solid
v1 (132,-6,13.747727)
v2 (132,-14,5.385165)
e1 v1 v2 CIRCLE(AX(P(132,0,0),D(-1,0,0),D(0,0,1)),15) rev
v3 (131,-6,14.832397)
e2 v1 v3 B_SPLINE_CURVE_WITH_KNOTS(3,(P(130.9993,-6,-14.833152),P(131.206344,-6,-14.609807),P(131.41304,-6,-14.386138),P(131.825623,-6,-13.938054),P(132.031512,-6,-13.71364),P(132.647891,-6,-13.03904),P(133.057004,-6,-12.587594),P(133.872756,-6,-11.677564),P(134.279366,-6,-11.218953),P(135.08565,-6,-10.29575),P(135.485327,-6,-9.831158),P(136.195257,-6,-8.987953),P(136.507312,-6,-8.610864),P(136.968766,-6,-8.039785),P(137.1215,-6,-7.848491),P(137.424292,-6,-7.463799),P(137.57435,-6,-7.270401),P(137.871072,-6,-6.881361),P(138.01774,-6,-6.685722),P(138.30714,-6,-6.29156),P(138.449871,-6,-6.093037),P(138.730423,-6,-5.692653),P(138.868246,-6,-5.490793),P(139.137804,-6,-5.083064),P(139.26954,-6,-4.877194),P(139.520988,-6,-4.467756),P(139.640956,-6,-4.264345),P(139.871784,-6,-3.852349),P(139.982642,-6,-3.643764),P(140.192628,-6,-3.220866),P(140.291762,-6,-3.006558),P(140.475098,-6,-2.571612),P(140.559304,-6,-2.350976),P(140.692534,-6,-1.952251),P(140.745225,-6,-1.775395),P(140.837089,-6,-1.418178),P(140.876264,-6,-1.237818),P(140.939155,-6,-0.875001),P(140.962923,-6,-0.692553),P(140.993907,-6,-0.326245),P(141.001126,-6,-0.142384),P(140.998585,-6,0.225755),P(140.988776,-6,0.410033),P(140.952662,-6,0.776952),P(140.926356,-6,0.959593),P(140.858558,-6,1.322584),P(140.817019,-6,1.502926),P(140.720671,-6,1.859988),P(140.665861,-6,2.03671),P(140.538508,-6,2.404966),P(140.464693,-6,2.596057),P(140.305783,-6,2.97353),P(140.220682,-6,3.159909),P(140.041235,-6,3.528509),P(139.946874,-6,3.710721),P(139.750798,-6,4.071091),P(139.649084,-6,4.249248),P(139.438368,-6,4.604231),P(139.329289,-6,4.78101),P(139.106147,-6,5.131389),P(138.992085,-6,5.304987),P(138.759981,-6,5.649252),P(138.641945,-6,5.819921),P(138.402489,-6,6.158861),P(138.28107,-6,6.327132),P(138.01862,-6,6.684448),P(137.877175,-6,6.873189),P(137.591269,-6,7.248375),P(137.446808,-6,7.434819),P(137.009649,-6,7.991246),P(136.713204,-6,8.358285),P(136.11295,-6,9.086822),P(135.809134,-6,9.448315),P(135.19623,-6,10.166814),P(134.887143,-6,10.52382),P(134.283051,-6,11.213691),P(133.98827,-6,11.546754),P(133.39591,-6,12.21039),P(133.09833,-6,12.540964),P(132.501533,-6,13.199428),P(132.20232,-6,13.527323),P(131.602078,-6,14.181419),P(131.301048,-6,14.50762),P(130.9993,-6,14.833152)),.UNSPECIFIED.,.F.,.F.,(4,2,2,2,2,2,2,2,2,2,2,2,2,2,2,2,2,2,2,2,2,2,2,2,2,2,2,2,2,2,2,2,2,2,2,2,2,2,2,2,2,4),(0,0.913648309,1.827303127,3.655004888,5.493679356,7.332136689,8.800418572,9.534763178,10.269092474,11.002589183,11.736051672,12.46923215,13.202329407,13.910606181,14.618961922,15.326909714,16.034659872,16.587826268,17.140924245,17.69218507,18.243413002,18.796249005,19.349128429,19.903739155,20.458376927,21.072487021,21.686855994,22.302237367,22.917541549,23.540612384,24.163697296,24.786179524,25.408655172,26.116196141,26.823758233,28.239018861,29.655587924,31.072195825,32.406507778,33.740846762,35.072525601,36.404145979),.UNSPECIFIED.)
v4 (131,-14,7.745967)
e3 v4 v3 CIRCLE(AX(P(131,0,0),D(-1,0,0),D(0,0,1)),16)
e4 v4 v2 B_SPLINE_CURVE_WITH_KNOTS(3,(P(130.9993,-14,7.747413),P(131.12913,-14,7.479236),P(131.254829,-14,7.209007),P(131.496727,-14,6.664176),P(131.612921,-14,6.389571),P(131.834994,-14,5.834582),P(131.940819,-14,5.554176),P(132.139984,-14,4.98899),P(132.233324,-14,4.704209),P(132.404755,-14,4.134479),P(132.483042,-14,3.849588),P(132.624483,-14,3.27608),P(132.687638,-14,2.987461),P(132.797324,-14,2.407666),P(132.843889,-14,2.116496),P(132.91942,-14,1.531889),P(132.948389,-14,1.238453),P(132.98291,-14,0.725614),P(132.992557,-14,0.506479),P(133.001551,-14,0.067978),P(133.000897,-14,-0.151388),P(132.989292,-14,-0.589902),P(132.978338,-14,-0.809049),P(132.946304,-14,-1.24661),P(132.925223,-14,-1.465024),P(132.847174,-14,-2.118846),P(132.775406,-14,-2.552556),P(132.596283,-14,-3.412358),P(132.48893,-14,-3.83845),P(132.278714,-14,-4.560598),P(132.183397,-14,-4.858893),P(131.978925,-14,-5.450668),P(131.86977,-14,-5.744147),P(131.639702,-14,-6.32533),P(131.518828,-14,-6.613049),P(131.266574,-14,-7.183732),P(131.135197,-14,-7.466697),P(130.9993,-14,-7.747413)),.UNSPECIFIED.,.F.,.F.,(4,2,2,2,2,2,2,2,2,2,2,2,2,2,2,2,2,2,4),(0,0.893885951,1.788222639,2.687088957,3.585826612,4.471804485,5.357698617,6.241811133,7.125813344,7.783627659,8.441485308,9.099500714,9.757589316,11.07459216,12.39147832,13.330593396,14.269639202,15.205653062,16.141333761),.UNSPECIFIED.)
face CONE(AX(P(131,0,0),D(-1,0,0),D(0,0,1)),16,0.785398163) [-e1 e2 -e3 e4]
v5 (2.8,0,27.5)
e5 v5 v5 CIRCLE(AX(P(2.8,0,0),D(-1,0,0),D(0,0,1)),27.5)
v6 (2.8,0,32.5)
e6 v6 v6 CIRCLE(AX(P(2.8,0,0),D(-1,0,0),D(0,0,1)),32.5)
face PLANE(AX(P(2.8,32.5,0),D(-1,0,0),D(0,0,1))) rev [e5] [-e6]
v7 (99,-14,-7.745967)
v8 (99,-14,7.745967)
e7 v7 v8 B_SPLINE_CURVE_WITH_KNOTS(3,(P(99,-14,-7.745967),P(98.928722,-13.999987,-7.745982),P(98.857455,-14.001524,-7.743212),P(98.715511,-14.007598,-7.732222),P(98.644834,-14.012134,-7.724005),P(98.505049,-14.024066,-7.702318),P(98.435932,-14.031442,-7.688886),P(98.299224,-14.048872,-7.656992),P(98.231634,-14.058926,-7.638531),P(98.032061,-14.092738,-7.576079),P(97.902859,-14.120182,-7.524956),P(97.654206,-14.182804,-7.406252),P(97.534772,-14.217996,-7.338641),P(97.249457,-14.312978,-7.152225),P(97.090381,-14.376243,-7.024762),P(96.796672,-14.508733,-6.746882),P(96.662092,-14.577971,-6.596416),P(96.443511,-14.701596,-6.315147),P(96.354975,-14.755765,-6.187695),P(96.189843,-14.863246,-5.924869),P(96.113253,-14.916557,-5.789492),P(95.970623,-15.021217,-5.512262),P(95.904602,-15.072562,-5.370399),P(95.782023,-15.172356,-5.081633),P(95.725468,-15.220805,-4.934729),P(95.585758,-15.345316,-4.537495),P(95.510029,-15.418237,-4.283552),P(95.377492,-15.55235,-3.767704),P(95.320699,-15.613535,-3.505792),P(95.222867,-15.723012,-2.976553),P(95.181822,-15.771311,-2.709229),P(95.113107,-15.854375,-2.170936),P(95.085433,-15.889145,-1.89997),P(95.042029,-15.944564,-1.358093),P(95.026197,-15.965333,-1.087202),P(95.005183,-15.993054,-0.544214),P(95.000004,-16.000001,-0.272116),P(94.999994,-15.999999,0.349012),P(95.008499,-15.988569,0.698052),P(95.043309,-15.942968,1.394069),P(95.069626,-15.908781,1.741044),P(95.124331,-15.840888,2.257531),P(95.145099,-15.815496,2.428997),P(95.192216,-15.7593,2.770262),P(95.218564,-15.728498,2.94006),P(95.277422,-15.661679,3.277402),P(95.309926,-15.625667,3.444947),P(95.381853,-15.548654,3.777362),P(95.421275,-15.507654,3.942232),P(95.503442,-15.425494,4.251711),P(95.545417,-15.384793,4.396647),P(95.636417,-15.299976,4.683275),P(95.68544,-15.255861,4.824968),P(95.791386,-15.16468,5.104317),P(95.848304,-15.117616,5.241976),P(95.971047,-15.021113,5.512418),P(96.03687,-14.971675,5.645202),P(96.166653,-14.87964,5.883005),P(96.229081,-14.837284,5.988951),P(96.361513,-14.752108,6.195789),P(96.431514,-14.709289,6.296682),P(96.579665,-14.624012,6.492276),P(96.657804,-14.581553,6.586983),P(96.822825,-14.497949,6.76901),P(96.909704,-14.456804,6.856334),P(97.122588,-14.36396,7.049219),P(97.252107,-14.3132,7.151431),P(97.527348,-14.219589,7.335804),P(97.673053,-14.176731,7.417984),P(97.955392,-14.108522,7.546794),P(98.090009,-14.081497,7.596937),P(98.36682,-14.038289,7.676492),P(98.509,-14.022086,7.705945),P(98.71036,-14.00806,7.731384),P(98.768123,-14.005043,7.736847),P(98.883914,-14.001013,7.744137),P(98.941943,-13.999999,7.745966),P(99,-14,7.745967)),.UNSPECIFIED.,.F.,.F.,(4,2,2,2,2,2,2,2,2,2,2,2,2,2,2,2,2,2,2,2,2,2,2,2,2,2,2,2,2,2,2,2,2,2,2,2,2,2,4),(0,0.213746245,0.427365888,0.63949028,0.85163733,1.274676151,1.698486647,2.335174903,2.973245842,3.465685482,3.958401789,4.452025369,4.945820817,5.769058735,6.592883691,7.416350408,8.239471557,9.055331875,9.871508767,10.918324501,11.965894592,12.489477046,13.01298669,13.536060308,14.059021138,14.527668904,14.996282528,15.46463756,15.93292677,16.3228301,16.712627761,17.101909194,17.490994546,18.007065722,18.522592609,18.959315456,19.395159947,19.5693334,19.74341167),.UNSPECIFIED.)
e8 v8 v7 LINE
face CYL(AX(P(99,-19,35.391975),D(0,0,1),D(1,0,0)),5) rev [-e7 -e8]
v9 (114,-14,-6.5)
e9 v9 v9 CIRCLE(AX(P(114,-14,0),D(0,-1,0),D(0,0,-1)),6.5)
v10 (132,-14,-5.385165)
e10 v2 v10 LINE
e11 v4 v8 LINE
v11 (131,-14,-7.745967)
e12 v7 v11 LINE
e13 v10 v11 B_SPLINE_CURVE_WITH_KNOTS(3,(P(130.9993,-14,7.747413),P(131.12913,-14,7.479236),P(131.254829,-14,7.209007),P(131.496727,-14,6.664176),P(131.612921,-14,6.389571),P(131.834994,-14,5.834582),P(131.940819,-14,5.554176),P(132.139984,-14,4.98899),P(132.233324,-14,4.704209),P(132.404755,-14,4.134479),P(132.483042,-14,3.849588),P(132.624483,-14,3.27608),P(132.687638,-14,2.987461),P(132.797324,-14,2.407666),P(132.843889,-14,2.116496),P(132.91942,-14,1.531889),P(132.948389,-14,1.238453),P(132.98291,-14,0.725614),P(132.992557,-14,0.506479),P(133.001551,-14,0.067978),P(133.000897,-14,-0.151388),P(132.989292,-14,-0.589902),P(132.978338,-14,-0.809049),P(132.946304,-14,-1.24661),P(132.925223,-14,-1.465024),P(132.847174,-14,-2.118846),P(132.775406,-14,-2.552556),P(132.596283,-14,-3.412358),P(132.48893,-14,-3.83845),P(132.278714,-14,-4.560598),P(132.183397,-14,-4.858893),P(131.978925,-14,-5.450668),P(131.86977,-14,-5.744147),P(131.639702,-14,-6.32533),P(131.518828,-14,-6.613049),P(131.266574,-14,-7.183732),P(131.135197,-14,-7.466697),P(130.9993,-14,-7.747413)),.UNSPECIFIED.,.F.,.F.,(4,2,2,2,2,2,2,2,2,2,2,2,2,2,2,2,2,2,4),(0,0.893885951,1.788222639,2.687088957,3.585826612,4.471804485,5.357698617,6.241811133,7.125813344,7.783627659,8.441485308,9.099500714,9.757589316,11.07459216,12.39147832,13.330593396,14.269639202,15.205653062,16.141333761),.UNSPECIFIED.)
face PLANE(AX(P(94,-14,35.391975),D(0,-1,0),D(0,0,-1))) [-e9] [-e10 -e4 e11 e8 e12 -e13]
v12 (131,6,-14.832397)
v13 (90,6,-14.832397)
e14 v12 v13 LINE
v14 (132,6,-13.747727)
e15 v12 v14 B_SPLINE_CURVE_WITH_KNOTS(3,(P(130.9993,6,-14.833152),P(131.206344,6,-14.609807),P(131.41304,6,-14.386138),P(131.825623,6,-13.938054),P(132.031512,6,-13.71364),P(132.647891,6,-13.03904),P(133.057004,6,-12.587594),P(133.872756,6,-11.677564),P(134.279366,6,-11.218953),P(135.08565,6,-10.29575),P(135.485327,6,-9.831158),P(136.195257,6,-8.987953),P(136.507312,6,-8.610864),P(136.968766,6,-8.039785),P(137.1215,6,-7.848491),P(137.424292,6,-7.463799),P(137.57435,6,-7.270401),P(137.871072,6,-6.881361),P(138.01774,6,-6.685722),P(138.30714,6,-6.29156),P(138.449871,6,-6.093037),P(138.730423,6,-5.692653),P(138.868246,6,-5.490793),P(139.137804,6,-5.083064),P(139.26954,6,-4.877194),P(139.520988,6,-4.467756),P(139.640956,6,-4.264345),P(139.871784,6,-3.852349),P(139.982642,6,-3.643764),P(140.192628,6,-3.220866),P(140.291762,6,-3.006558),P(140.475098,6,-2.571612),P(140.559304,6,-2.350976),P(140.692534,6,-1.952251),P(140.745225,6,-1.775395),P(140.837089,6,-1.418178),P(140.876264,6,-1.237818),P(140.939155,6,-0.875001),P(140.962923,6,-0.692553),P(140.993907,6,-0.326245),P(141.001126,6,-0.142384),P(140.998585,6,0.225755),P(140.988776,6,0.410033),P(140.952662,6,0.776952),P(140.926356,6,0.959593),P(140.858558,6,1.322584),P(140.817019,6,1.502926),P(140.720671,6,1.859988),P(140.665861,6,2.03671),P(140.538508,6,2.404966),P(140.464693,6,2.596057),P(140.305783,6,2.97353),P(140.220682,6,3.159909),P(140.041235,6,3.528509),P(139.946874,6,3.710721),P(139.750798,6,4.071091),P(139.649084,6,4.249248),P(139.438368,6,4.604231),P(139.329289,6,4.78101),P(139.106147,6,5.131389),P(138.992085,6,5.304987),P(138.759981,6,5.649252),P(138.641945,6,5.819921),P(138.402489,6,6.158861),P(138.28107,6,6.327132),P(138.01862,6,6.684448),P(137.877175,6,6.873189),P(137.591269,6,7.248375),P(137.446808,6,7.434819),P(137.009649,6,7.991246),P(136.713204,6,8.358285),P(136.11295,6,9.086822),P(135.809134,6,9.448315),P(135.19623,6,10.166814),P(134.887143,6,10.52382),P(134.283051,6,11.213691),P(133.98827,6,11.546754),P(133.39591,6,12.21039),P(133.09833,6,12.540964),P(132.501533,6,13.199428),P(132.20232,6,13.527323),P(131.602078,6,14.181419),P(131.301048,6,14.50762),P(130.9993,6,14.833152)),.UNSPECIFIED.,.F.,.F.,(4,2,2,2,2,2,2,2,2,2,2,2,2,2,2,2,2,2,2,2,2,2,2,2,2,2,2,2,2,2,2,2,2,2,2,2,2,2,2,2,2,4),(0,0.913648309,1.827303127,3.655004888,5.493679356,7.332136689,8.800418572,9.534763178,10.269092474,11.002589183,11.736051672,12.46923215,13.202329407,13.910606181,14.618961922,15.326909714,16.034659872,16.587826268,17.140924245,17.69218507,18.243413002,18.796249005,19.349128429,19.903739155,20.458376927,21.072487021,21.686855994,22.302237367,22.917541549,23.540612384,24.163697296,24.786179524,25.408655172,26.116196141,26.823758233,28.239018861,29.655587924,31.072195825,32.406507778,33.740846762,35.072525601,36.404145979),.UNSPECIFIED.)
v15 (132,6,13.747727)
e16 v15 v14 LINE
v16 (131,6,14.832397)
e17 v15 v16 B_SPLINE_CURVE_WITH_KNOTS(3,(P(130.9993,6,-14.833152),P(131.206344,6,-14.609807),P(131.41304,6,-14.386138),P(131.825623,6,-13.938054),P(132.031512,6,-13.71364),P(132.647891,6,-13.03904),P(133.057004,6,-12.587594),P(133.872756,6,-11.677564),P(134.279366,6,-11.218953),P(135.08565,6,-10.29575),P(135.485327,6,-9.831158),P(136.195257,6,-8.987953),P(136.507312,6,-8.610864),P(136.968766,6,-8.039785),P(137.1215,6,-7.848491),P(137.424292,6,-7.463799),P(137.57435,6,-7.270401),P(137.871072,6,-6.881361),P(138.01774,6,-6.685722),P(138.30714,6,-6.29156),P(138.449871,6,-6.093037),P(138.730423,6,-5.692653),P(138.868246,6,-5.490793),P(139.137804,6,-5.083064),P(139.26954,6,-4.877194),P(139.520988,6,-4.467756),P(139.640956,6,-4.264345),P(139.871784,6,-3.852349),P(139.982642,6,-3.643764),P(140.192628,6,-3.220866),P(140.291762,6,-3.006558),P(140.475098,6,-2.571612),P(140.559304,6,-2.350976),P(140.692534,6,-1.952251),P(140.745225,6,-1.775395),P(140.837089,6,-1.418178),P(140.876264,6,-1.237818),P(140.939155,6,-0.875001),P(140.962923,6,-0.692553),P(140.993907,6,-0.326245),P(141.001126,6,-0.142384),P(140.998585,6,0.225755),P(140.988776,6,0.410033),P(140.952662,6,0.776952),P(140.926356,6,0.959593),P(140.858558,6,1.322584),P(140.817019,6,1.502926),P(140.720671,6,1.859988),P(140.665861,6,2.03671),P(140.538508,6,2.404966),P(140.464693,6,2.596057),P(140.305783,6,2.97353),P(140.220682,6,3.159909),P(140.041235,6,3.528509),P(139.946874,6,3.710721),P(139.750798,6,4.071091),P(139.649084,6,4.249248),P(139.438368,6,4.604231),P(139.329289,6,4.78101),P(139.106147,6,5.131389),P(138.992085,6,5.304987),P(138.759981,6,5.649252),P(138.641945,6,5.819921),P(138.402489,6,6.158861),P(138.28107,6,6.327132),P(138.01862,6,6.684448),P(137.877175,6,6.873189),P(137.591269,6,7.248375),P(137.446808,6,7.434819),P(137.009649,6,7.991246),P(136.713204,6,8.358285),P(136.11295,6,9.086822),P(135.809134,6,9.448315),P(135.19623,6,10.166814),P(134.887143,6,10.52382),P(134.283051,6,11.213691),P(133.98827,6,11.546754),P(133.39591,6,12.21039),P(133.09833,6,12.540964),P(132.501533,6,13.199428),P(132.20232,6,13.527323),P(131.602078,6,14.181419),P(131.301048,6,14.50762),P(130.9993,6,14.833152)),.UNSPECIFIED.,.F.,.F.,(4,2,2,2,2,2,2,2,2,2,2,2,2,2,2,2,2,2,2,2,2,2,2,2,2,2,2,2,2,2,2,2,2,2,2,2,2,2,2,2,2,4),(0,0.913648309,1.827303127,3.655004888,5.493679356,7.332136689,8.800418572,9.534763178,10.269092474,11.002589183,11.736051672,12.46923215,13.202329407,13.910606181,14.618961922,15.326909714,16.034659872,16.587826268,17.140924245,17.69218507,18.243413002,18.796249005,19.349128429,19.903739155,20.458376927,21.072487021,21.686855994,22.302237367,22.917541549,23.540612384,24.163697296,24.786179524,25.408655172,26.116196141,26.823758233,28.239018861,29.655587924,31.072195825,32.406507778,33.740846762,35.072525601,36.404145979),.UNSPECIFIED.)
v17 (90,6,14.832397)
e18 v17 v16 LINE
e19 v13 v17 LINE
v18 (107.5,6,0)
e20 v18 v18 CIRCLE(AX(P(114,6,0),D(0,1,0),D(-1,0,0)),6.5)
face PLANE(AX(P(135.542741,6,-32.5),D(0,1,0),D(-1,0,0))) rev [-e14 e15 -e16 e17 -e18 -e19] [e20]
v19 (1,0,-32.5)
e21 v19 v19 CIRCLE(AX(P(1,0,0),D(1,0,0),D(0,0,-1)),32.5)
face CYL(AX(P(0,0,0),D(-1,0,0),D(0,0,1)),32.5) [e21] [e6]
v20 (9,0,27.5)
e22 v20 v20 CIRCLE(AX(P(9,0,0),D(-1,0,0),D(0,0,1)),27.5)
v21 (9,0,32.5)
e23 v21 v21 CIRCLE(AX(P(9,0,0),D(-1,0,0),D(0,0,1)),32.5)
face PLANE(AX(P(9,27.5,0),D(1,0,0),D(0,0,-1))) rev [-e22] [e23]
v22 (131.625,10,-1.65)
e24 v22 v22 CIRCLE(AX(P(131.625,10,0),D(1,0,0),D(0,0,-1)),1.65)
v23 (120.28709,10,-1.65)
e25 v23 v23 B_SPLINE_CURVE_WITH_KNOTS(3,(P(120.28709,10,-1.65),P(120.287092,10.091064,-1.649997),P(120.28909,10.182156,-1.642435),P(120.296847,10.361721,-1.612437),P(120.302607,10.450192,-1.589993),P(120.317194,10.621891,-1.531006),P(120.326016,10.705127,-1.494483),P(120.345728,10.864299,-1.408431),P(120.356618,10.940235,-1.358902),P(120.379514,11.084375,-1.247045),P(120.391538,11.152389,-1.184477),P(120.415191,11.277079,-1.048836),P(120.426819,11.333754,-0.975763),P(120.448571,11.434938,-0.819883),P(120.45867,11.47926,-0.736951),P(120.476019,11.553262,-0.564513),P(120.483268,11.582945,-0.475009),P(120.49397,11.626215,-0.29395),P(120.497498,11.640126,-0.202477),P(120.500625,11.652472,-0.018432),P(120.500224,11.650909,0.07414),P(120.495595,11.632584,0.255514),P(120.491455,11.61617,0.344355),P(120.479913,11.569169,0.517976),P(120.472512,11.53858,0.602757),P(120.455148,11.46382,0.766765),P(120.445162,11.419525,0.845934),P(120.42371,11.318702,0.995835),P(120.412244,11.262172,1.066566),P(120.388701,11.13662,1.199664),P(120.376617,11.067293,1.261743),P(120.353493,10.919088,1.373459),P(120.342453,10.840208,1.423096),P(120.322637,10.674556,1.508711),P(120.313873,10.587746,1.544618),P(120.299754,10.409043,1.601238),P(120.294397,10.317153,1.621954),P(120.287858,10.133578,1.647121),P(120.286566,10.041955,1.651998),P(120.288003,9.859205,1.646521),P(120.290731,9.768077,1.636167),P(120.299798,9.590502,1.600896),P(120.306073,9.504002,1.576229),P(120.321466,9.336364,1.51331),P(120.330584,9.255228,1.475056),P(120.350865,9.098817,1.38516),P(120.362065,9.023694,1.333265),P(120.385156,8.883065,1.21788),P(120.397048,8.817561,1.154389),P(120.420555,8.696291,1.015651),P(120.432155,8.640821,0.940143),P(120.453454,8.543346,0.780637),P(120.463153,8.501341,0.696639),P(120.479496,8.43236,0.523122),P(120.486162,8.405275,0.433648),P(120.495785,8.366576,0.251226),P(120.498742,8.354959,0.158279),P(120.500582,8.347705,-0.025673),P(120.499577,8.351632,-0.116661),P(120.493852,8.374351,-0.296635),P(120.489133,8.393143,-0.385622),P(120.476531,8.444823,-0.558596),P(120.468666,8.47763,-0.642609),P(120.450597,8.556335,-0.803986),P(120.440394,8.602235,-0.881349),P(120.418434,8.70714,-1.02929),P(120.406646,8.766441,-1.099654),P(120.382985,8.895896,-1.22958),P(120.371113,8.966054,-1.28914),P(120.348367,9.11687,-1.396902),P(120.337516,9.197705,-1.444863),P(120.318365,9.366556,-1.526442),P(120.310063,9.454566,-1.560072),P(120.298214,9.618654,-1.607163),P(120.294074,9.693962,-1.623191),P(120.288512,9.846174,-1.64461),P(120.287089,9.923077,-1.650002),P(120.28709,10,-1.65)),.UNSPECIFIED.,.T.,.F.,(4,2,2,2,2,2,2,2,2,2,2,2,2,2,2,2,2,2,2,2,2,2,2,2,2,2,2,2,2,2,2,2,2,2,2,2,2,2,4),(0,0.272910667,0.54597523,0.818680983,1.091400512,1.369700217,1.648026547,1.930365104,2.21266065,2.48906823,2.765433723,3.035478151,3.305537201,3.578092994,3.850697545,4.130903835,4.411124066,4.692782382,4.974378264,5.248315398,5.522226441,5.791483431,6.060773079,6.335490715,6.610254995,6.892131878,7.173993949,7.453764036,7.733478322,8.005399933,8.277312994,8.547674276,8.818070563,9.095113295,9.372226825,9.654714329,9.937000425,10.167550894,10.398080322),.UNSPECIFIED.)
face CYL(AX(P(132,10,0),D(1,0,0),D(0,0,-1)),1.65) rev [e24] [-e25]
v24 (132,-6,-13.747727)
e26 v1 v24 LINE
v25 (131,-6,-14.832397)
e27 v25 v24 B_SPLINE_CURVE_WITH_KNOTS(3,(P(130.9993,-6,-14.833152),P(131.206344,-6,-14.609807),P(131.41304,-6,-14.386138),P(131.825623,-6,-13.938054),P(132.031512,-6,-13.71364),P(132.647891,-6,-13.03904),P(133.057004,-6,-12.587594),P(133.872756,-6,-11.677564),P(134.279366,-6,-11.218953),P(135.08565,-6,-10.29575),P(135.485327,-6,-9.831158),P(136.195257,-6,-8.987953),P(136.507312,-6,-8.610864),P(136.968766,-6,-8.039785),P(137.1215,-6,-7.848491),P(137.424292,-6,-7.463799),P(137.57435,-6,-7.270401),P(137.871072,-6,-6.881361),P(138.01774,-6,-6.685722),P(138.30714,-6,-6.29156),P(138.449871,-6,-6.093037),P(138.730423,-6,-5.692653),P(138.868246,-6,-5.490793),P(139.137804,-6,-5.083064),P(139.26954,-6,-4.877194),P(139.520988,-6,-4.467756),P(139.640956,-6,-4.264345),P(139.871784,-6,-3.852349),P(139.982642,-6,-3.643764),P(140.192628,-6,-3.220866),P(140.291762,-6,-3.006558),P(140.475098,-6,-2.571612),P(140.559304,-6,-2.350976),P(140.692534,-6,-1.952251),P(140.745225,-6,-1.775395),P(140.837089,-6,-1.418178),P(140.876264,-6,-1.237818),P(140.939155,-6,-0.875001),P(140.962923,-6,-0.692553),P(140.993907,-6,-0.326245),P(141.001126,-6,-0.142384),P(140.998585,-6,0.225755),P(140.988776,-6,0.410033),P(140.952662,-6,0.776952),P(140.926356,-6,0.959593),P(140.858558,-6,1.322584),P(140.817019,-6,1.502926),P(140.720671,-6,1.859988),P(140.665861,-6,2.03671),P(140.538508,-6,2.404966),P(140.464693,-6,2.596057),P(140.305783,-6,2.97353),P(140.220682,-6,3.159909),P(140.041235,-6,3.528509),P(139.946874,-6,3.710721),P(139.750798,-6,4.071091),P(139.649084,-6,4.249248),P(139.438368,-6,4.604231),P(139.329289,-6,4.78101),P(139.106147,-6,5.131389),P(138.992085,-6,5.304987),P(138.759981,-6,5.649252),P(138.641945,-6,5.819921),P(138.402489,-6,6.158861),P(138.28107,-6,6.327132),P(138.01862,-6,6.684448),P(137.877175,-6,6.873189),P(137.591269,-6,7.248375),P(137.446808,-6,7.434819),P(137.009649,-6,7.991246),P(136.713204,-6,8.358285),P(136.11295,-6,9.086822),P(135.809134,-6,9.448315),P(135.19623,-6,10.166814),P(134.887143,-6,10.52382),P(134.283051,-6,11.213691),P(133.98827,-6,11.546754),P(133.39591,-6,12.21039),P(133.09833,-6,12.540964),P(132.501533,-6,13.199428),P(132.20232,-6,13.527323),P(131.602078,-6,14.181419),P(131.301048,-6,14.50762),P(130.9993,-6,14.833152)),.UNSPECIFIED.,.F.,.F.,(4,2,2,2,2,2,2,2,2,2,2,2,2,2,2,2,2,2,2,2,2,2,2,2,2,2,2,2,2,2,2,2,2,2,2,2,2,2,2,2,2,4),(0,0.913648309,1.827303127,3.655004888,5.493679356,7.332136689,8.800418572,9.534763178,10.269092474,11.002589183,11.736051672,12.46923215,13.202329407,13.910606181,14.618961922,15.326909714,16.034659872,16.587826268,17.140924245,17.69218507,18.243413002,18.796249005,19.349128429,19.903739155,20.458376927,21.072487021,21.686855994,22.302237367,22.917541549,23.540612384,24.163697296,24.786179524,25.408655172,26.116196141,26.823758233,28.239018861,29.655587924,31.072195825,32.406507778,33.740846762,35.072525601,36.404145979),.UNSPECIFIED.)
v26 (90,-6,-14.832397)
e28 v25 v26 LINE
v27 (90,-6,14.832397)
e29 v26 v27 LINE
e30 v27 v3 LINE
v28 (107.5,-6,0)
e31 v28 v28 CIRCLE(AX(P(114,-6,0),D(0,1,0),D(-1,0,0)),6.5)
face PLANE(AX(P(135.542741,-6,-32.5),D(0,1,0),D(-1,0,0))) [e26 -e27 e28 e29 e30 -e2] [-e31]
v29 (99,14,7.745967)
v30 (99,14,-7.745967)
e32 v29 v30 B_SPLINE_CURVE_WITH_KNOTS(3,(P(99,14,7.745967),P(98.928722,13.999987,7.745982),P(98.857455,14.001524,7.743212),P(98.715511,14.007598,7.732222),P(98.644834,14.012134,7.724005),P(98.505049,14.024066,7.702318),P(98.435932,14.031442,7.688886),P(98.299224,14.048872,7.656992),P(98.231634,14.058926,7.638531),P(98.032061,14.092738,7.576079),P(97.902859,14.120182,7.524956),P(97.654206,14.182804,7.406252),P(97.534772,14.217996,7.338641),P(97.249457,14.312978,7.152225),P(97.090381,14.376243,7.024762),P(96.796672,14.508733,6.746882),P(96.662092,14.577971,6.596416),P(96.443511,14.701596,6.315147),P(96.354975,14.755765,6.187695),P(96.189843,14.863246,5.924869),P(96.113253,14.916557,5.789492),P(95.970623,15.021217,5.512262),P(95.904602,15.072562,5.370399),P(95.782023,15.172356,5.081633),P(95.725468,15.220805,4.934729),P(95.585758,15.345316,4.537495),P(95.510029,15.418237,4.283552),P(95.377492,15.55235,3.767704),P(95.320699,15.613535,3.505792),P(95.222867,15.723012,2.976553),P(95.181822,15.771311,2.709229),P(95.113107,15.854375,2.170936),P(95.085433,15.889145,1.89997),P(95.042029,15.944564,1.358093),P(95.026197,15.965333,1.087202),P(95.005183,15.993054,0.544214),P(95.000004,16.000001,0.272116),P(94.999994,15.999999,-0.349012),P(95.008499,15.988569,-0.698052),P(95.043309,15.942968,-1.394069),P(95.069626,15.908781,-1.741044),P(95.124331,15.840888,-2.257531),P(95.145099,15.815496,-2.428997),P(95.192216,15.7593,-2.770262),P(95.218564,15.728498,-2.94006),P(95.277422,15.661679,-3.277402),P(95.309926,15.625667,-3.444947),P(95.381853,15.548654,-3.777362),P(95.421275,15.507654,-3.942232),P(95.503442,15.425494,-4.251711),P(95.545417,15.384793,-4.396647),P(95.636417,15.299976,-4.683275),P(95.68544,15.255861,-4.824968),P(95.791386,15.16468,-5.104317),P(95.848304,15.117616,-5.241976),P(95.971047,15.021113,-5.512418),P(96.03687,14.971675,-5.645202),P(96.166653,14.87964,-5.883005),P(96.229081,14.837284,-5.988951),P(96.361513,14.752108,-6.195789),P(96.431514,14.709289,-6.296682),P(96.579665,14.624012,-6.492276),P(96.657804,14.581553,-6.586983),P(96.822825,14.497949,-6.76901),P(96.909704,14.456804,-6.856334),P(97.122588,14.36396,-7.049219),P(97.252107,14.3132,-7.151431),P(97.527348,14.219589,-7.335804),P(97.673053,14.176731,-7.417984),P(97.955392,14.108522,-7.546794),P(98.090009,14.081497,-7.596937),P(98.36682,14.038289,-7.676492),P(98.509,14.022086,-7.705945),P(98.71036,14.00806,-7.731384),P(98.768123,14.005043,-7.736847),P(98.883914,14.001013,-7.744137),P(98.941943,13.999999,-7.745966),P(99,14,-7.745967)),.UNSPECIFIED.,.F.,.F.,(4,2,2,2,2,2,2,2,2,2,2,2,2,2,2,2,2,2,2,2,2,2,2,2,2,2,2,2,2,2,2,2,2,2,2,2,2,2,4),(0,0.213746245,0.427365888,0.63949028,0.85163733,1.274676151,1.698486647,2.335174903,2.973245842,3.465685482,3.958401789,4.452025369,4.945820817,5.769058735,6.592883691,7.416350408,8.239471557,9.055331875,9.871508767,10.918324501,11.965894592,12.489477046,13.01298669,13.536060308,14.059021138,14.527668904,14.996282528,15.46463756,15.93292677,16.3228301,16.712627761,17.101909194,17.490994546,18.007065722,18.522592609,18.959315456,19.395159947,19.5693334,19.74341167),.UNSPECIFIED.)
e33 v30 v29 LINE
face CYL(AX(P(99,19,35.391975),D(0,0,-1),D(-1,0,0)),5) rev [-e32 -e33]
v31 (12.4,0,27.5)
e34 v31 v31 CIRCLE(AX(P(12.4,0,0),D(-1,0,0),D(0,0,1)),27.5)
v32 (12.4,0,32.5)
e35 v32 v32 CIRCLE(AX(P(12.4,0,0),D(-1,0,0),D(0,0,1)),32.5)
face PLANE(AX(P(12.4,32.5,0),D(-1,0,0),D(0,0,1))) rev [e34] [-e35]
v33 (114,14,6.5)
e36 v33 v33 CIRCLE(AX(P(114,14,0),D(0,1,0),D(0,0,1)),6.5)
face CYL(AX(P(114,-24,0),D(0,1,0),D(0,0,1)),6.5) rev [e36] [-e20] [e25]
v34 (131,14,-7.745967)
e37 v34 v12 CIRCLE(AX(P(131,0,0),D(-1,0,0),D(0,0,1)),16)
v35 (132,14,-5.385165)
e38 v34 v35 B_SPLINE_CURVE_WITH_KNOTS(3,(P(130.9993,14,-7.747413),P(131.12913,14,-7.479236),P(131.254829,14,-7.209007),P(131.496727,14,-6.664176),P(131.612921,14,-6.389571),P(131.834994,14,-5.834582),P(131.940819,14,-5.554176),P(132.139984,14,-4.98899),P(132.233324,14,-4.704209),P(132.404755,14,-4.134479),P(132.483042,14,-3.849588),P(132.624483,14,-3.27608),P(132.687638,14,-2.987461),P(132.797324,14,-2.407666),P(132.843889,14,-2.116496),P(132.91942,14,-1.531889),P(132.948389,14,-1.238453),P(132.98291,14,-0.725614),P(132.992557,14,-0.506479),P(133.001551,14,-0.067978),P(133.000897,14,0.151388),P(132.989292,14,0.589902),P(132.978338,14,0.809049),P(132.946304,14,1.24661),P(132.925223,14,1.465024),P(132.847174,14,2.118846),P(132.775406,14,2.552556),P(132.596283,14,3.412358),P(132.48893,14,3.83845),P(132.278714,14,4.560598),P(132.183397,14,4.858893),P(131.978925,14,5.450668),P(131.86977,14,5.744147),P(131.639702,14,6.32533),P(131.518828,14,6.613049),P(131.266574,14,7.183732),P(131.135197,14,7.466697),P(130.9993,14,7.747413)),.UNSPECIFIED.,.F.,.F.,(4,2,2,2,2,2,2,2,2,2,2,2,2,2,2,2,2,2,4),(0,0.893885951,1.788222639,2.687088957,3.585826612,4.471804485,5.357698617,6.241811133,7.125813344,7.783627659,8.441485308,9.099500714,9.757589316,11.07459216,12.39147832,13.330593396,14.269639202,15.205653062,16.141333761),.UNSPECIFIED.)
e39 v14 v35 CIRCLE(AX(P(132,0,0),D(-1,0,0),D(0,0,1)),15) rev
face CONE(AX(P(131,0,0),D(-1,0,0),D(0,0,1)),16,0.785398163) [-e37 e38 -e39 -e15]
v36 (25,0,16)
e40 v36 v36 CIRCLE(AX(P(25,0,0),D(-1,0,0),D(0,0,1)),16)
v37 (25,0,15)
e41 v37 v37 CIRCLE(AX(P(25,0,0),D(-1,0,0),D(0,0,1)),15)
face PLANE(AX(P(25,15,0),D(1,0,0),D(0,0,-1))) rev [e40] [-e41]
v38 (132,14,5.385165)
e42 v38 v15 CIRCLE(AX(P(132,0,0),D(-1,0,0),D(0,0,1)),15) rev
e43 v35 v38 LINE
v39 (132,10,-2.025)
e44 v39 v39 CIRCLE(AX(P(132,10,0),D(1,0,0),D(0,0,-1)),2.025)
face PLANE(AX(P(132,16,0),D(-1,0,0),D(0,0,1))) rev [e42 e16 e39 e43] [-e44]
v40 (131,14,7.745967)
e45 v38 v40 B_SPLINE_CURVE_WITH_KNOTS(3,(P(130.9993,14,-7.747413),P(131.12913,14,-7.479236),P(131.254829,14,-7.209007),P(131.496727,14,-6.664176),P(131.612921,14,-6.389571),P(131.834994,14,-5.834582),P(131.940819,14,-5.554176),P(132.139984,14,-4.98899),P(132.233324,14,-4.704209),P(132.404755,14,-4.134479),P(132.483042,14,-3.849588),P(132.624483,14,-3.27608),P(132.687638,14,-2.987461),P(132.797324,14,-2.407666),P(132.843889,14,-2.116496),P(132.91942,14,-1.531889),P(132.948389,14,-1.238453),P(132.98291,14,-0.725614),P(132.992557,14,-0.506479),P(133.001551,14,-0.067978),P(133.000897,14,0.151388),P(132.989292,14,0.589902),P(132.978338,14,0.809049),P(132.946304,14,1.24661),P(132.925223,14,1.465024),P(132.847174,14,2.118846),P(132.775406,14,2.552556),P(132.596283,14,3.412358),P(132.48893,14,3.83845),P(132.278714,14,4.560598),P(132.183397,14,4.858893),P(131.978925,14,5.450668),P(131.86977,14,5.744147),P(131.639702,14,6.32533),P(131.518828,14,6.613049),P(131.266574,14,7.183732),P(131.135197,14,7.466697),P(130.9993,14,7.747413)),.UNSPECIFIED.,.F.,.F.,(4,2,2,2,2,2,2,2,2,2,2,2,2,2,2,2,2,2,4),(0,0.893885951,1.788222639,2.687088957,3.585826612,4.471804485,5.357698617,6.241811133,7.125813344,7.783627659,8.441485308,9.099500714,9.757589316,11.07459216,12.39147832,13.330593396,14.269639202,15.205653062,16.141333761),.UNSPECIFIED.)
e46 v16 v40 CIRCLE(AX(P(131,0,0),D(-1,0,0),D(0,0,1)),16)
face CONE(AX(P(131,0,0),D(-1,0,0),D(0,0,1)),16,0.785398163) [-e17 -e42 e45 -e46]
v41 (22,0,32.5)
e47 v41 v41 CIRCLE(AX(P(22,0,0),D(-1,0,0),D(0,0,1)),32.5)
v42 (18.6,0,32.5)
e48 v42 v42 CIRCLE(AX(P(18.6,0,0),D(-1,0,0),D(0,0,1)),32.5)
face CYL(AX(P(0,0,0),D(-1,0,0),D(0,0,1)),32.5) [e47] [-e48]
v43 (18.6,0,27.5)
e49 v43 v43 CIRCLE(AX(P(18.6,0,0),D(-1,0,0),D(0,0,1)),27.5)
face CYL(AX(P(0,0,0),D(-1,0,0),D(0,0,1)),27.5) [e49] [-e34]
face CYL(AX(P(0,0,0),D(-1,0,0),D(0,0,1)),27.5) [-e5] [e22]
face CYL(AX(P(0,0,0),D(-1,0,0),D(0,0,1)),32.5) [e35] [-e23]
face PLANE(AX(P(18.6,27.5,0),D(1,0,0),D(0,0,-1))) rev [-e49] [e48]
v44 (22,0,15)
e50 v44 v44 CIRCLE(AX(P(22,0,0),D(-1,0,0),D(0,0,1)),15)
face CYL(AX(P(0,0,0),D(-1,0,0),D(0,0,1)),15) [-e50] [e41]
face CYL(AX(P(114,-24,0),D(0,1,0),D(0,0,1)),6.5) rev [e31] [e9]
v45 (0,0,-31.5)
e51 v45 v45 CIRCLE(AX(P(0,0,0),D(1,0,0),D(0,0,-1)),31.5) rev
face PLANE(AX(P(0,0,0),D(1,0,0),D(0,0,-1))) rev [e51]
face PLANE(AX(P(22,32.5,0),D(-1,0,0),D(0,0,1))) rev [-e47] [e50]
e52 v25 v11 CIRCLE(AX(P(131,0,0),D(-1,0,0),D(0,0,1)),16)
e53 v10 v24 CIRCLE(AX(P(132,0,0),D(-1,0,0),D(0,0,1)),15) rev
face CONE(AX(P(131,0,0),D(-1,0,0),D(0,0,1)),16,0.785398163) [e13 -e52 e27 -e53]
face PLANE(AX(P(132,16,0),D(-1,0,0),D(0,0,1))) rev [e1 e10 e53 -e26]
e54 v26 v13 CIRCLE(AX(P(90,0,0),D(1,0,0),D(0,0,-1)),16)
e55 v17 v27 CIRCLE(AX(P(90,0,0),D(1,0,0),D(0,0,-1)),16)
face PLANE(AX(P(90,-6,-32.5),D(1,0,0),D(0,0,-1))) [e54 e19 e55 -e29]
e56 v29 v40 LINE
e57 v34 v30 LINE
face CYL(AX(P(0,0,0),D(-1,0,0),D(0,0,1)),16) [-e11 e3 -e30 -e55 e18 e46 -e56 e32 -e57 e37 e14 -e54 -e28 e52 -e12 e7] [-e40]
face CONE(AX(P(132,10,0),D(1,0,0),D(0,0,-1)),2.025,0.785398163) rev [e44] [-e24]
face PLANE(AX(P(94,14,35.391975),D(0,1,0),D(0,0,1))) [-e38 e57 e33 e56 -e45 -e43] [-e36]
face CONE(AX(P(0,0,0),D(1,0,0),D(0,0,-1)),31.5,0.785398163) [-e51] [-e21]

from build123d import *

# Parameters (mm, degrees)
CHAMFER_2_SIZE           = 1
CHAMFER_1_SIZE           = 1
CUT_EXTRUDE_1_DEPTH      = 140.773030303
CUT_EXTRUDE_1_DEPTH_BACK = 140.773030303
SKETCH_2_W               = 45.54274113
SKETCH_2_H               = 12
SKETCH_3_OUTSIDE_W       = 99.17
SKETCH_3_OUTSIDE_H       = 99.17
SKETCH_3_OUTSIDE_W_2     = 70.7839493
SKETCH_3_OUTSIDE_H_2     = 28
CUT_EXTRUDE_1_2_DEPTH    = 38
FILLET_1_R               = 5
SKETCH_4_R               = 6.5
CUT_EXTRUDE_2_DEPTH      = 38


# Read off the part's stored shape, not the designer's step: M4 螺纹孔1
with BuildPart() as part:
    # 草图1 → 旋转1 (revolve)
    with BuildSketch(Plane.XY, mode=Mode.PRIVATE) as revolve_1_sk:
        Polygon((0, 0), (0, 32.5), (2.8, 32.5), (2.8, 27.5), (9, 27.5), (9, 32.5), (12.4, 32.5), (12.4, 27.5), (18.6, 27.5), (18.6, 32.5), (22, 32.5), (22, 15), (25, 15), (25, 16), (132, 16), (132, 0), align=None)
    revolve(revolve_1_sk.sketch.rotate(Axis((0, 0, 0), (1, 0, 0)), 90), axis=Axis((0, 0, 0), (1, 0, 0)))

    # 倒角2
    chamfer_2_edges = [part.edges().sort_by_distance(p)[0] for p in [
        (132, 0, -16),
    ]]
    chamfer(chamfer_2_edges, length=CHAMFER_2_SIZE)

    # 倒角1
    chamfer_1_edges = [part.edges().sort_by_distance(p)[0] for p in [
        (0, 0, -32.5),
    ]]
    chamfer(chamfer_1_edges, length=CHAMFER_1_SIZE)

    # 草图2 → Cut-Extrude 1 (cut, two sides: drawn at the far end of the back side and taken through both)
    with BuildSketch(Plane.XY.offset(-CUT_EXTRUDE_1_DEPTH_BACK)):
        with Locations((112.771370565, 0)):
            Rectangle(SKETCH_2_W, SKETCH_2_H)
    extrude(amount=CUT_EXTRUDE_1_DEPTH + CUT_EXTRUDE_1_DEPTH_BACK, mode=Mode.SUBTRACT)

    # 草图3 outside → Cut-Extrude 1 2 (cut)
    with BuildSketch(Plane(origin=(132, 0, 0), x_dir=(0, 0, -1), z_dir=(1, 0, 0))):
        Rectangle(SKETCH_3_OUTSIDE_W, SKETCH_3_OUTSIDE_H)
        Rectangle(SKETCH_3_OUTSIDE_W_2, SKETCH_3_OUTSIDE_H_2, mode=Mode.SUBTRACT)
    extrude(amount=-CUT_EXTRUDE_1_2_DEPTH, mode=Mode.SUBTRACT)

    # 圆角1
    # the kernel refuses this fillet: 5 mm, written as the material it adds along each edge
    with BuildSketch(Plane(origin=(94, -14, 20.245966692), x_dir=(1, 0, 0), z_dir=(0, 0, -1))) as fillet_1_piece_1_section:
        with BuildLine():
            CenterArc((FILLET_1_R, FILLET_1_R), FILLET_1_R, 180, 90)
            Line((0, FILLET_1_R), (0, 0))
            Line((0, 0), (FILLET_1_R, 0))
        make_face()
    fillet_1_piece_1 = extrude(amount=40.491933385, mode=Mode.PRIVATE)
    fillet_1_piece_1 = fillet_1_piece_1 & Plane(origin=(95.499656212, 0, 0), x_dir=(0, 0, 1), z_dir=(1, 0, 0)) * Cylinder(16, 101, mode=Mode.PRIVATE)
    add(fillet_1_piece_1)
    with BuildSketch(Plane(origin=(94, 14, -20.245966692), x_dir=(1, 0, 0), z_dir=(0, 0, 1))) as fillet_1_piece_2_section:
        with BuildLine():
            CenterArc((FILLET_1_R, FILLET_1_R), FILLET_1_R, 180, 90)
            Line((0, FILLET_1_R), (0, 0))
            Line((0, 0), (FILLET_1_R, 0))
        make_face()
    fillet_1_piece_2 = extrude(amount=40.491933385, mode=Mode.PRIVATE)
    fillet_1_piece_2 = fillet_1_piece_2 & Plane(origin=(95.499656212, 0, 0), x_dir=(0, 0, 1), z_dir=(1, 0, 0)) * Cylinder(16, 101, mode=Mode.PRIVATE)
    add(fillet_1_piece_2)

    # 草图4 → 切除-拉伸2 (cut)
    with BuildSketch(Plane(origin=(0, 14, 0), x_dir=(1, 0, 0), z_dir=(0, 1, 0))):
        with Locations(Location((114, 0, 0), (0, 0, 180))):
            Circle(SKETCH_4_R)
    extrude(amount=-CUT_EXTRUDE_2_DEPTH, mode=Mode.SUBTRACT)

    # M4 螺纹孔1 outline → M4 螺纹孔1 (revolve, cut)
    with BuildSketch(Plane(origin=(0, 10, 0), x_dir=(0, 1, 0), z_dir=(0, 0, -1))):
        Polygon((0, 120.286969782), (1.65, 120.286969782), (1.65, 131.625), (2.025, 132), (0, 132), align=None)
    revolve(axis=Axis((0, 10, 0), (1, 0, 0)), mode=Mode.SUBTRACT)


solid = part.part
